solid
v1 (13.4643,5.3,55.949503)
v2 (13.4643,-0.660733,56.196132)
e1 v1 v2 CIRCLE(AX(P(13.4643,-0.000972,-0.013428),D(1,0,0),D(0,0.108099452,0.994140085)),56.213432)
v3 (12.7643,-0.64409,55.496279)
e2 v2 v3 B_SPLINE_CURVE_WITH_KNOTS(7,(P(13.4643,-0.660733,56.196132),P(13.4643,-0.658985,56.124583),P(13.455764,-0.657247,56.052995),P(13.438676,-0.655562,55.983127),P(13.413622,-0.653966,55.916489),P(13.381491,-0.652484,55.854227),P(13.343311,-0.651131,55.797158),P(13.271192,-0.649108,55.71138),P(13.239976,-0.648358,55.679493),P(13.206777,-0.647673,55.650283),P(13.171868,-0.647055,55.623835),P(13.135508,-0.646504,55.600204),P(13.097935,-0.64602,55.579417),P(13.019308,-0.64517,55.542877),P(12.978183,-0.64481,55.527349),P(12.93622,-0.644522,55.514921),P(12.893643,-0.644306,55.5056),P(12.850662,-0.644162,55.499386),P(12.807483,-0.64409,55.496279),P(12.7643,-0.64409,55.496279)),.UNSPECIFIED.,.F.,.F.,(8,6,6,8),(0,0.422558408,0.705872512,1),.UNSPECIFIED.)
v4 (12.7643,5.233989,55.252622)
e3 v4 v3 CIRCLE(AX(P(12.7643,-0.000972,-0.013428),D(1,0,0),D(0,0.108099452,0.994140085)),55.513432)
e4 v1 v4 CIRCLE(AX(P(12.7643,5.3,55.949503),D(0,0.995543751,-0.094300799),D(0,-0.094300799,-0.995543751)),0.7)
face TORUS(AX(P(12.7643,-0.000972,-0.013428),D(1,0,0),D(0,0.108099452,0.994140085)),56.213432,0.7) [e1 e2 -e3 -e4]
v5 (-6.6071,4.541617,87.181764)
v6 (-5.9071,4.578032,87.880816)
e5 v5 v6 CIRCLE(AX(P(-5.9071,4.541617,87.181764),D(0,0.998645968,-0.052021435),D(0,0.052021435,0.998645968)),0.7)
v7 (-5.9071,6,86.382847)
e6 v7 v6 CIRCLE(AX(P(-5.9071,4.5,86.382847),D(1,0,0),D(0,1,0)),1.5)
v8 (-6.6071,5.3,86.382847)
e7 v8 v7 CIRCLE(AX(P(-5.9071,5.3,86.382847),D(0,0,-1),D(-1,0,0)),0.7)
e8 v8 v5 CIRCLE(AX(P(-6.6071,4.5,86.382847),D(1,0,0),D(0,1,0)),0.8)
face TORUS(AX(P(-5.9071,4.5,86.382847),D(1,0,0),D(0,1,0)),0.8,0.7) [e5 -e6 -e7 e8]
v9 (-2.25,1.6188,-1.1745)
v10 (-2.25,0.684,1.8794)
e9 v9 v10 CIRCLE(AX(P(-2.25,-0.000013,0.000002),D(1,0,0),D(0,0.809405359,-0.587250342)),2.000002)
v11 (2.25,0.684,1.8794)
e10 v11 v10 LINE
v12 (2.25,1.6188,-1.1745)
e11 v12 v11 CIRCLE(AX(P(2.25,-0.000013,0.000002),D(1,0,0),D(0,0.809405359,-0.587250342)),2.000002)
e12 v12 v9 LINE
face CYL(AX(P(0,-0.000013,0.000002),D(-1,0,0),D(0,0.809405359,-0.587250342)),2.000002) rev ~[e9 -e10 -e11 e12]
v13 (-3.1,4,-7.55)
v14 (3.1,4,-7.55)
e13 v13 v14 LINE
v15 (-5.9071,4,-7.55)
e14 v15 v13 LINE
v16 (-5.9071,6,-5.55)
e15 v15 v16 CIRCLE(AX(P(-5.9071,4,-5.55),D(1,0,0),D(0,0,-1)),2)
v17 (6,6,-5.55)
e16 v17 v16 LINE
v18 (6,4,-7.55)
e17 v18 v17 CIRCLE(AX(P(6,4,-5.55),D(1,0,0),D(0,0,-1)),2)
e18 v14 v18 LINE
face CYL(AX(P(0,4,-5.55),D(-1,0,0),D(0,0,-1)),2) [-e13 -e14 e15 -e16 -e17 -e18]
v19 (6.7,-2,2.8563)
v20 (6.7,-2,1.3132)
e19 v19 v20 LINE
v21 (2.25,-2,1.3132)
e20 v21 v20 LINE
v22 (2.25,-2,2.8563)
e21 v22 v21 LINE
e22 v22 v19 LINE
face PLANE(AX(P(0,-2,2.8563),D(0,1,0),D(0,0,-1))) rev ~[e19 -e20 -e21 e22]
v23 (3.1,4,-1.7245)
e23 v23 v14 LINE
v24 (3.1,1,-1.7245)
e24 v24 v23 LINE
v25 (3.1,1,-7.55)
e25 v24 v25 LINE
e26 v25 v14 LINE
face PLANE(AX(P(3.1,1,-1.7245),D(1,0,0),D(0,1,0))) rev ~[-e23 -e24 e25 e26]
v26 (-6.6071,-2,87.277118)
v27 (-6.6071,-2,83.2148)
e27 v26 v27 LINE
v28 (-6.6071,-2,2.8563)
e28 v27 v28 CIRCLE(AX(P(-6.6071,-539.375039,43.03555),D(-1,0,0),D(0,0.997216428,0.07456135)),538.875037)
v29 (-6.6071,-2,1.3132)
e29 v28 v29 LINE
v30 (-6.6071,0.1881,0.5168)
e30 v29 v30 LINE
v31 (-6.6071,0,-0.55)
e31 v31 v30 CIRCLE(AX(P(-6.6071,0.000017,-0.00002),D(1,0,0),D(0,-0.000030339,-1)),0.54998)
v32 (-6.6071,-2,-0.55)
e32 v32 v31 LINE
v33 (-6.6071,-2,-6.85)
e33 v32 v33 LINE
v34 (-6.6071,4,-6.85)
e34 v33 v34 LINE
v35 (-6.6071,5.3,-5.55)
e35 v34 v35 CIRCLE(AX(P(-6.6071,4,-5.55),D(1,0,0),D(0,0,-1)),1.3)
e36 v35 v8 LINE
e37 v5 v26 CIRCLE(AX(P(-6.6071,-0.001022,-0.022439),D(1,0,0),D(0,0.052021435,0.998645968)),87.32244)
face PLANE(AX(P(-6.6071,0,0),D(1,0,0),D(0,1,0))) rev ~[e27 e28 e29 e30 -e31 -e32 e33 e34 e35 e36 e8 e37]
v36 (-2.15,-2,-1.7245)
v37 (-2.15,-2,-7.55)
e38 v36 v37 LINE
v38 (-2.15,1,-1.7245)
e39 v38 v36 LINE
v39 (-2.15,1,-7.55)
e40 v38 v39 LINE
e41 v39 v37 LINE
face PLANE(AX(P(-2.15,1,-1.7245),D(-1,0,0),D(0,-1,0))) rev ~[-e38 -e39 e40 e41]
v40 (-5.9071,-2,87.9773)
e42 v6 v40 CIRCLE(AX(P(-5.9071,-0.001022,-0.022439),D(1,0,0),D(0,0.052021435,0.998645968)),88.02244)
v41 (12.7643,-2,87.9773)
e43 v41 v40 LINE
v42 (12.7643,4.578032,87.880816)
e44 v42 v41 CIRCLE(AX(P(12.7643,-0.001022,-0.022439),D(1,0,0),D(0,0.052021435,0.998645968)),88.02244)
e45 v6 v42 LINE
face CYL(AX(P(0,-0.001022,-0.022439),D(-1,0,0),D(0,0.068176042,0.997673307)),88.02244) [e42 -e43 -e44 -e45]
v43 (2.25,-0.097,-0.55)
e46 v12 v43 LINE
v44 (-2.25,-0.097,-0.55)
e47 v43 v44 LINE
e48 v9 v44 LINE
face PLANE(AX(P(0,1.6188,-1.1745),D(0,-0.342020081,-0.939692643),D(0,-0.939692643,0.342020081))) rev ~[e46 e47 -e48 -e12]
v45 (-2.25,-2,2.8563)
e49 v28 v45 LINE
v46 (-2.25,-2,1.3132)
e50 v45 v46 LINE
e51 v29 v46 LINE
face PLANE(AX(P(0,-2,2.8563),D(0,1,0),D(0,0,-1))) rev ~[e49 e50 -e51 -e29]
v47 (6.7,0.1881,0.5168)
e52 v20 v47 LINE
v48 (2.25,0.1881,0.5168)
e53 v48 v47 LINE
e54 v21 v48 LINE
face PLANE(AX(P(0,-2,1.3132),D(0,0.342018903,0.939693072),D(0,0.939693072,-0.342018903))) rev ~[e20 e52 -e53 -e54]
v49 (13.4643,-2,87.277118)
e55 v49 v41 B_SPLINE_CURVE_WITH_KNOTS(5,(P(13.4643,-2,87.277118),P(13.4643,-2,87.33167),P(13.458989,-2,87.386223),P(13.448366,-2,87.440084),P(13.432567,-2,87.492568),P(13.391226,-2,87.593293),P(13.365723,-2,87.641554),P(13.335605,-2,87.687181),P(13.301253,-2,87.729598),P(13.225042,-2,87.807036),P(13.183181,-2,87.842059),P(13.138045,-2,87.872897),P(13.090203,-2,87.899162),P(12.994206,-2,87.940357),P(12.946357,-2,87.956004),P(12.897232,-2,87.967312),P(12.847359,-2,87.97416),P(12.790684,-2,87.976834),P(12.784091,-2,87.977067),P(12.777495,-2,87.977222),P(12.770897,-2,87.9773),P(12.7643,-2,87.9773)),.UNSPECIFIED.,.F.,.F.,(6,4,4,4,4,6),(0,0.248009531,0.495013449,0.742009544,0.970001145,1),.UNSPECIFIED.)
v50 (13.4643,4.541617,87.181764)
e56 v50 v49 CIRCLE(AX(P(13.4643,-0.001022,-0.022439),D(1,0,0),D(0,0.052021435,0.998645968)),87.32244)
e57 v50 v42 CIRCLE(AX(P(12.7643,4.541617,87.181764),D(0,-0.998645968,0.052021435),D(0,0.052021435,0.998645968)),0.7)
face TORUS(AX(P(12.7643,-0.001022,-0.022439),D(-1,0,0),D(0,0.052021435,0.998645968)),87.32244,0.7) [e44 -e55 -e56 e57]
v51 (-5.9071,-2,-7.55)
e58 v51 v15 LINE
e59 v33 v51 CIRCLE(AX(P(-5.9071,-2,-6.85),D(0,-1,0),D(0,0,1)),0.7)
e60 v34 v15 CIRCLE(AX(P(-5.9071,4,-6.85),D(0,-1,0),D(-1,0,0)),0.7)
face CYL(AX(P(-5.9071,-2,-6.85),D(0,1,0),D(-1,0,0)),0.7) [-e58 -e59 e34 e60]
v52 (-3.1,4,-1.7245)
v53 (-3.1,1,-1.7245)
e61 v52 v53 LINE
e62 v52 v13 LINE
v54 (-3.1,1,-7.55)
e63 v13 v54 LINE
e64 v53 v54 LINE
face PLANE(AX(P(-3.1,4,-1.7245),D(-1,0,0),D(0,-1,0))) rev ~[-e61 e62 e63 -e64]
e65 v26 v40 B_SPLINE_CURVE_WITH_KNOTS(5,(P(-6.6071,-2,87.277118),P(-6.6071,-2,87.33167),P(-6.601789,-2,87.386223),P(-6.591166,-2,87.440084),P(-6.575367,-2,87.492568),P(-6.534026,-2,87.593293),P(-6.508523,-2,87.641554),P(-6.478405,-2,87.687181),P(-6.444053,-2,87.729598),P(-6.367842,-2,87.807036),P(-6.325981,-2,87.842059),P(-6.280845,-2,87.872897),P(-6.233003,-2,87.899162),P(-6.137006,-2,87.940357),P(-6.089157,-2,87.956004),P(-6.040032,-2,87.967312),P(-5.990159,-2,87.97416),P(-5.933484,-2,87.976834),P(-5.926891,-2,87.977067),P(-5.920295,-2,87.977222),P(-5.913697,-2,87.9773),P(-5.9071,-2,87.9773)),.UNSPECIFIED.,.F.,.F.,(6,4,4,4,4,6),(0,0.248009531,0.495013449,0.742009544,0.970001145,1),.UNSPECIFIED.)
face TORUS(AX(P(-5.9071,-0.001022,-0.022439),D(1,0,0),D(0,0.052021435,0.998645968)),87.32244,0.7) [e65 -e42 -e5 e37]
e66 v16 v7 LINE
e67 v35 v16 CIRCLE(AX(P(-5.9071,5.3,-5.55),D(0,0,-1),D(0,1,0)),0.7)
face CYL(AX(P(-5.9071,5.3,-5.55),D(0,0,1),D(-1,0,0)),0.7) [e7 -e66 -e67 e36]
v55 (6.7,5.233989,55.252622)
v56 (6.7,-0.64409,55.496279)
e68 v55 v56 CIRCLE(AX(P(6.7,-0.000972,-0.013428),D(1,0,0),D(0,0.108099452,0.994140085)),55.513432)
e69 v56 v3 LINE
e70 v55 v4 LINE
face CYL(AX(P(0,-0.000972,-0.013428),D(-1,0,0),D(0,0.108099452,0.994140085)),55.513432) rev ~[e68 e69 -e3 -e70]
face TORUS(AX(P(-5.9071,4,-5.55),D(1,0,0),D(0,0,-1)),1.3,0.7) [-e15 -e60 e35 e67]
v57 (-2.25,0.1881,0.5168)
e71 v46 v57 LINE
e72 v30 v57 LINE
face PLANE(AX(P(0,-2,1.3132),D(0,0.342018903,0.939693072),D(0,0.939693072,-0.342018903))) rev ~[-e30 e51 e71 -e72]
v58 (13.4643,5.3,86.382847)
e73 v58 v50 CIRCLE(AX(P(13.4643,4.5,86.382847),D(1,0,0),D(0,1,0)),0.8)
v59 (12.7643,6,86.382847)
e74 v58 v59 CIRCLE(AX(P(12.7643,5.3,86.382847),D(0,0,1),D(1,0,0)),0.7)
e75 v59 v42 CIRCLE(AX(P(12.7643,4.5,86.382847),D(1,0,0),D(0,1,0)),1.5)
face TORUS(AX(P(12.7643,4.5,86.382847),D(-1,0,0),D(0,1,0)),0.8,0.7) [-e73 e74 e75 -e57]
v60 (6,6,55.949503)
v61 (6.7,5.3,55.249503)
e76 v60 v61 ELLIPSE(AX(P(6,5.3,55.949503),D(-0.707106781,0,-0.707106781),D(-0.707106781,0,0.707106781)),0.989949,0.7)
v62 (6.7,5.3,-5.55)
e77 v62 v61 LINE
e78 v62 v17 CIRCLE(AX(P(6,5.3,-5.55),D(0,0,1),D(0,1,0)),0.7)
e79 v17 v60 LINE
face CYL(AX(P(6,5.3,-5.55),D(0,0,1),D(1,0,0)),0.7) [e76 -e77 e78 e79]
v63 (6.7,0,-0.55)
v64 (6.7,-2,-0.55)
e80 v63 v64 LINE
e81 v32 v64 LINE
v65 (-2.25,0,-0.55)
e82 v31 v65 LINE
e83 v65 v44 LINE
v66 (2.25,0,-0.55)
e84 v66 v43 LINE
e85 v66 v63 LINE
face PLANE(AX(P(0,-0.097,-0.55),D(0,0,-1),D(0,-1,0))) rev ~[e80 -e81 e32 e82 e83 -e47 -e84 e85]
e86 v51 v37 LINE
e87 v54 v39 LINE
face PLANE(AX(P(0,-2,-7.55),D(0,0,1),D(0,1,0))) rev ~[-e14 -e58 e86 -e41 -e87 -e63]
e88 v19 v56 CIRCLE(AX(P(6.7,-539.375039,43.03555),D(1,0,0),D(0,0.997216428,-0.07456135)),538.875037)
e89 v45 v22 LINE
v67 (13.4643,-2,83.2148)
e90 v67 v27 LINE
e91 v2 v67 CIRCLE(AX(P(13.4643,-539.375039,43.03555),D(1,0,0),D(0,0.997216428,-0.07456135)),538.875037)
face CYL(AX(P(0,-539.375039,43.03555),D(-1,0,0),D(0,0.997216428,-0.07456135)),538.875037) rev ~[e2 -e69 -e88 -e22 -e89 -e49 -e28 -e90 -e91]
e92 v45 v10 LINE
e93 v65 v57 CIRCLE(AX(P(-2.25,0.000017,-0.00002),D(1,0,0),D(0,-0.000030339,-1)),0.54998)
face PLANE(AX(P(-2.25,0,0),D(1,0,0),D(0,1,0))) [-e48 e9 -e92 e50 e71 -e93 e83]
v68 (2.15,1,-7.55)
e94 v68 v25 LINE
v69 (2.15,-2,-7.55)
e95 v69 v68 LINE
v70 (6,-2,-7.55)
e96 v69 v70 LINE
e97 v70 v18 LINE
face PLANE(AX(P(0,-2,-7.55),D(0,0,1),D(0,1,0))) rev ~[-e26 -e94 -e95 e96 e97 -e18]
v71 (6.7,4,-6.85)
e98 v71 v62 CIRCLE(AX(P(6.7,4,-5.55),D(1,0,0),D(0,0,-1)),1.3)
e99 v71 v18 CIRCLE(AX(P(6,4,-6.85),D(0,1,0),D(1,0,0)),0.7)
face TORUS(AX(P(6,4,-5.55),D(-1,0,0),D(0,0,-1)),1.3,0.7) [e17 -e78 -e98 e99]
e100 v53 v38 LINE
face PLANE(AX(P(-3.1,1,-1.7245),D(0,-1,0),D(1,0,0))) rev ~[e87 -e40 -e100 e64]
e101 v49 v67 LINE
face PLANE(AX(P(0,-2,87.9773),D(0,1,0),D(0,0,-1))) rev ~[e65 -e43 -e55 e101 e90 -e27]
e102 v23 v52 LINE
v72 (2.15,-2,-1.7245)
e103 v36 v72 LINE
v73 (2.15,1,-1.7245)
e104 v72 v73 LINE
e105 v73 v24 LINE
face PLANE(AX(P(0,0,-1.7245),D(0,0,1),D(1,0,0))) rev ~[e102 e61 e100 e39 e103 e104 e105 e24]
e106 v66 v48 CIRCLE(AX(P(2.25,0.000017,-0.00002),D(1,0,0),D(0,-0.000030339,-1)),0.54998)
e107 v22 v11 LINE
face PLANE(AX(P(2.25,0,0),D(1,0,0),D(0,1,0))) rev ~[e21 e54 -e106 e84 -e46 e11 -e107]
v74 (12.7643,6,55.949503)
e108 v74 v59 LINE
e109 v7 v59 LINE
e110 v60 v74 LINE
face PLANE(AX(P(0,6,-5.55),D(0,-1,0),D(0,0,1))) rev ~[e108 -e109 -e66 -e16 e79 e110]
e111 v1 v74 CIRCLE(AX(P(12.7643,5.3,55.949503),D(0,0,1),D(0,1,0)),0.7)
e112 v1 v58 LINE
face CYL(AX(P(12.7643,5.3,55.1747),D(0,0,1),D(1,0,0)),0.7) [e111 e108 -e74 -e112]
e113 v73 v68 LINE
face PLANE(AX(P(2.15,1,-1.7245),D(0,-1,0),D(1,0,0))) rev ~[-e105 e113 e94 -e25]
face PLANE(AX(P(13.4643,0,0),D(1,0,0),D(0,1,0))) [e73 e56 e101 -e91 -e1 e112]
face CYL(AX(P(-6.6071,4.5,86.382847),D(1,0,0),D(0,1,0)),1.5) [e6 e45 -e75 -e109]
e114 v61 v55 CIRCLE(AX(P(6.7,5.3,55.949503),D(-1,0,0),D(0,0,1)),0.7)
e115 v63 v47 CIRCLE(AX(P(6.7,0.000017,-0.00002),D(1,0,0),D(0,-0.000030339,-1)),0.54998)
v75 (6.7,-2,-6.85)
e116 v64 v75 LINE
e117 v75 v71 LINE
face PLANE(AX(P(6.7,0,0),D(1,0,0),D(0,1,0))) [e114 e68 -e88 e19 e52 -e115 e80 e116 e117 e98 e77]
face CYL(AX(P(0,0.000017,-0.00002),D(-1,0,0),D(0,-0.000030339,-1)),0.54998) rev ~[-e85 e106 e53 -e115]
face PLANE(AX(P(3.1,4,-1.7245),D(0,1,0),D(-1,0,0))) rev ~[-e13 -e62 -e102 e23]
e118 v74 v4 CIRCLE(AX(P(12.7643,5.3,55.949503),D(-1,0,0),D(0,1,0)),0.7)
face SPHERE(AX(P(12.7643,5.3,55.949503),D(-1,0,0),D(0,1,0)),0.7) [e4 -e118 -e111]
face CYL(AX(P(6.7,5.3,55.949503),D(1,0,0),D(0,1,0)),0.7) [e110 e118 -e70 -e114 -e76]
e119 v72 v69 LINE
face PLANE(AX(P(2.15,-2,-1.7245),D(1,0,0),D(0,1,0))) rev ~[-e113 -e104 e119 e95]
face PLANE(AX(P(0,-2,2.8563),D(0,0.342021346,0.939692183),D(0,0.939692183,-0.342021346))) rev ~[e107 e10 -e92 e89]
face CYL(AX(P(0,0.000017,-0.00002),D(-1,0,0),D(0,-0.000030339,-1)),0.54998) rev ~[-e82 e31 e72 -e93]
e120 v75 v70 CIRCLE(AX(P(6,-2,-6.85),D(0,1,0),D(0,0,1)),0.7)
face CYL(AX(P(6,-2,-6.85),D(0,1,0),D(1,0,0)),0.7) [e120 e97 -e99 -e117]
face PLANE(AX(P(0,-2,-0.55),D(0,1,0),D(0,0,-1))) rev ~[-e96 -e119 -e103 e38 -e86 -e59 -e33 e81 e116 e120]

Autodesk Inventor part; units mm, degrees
ref_plane "YZ Plane" through (0, 0, 0) normal (1, 0, 0) x (0, 1, 0)
ref_plane "XZ Plane" through (0, 0, 0) normal (0, 1, 0) x (-1, 0, 0)
ref_plane "Slot Start Plane" through (0, 0, -1.7245) normal (0, 0, 1) x (1, 0, 0)
sketch "Key Profile" plane through (0, 0, 0) normal (1, 0, 0) x (0, 1, 0)
  line L0 (-2, 2.8563) -> (0.684, 1.8794)
  arc A0 (1.6188, -1.1745) -> (0.684, 1.8794) centre (0, 0) ccw
  line L1 (-2, 1.3132) -> (0.1881, 0.5168)
  arc A1 (0, -0.55) -> (0.1881, 0.5168) centre (0, 0) ccw
  line L2 (-2, 2.8563) -> (-2, -0.55)
  line L3 (0, 0) -> (-2, 0) construction
  line L4 (0, -0.55) -> (-2, -0.55)
  line L5 (1.6188, -1.1745) -> (-0.097, -0.55)
  line L6 (6, -5.55) -> (6, 87.7952)
  line L7 (-2, 87.9773) -> (-2, 2.8563)
  arc A2 (6, 87.7952) -> (-2, 87.9773) centre (0, 0) ccw
  line L8 (-2, -0.55) -> (-2, -7.55)
  arc A3 (4, -7.55) -> (6, -5.55) centre (4, -5.55) ccw
  line L9 (-2, -7.55) -> (4, -7.55)
  arc A4 (6, 55.1747) -> (-2, 55.464) centre (0, 0) ccw
  arc A5 (-2, 2.8563) -> (-2, 83.2148) centre (-539.3737, 43.0355) ccw
  point P0 (-0.5, 43.0355)
  point P1 (-0.6441, 55.4963)
  dimension "my_hingeCutRad" = 0.55
  dimension "my_hingeDepth" = 2
  dimension "my_hingeRegCutRad" = 2
  dimension "keyLength" = 88
  dimension "my_KeyHeight" = 8
  dimension "d107" = 20
  dimension "d122" = 4
  dimension "slotOffset" = 1.1745
  dimension "my_backWidth" = 7
  dimension "d128" = 55.5
  dimension "d143" = 1.5
  dimension "d144" = 4.7625
extrude "Upper (u)" add sketch "Key Profile" along normal blind 6.7 and the other way blind 6.6071 contours A5 A4 L6 A3 L9 L8 L4 L5 A0 L0 | L0 A0 L5 L4 A1 L1 L2
extrude "Lower (d)" add sketch "Key Profile" along normal blind 13.4643 and the other way blind 6.6071 contours A5 L7 A2 L6 A4
extrude "Protrusion Cutout" cut sketch "Key Profile" along normal mid plane 4.5 contours L0 A0 L5 L4 A1 L1 L2
fillet "Front Fillet" radius 1.5 1 edges at (3.4286, 6, 87.7952)
sketch "Slot Sketch" plane through (0, 0, -1.7245) normal (0, 0, 1) x (1, 0, 0)
  line L0 (2.15, -2) -> (2.15, 1)
  line L1 (3.1, 4) -> (-3.1, 4)
  line L2 (-2.15, 1) -> (-2.15, -2)
  line L3 (-2.15, -2) -> (2.15, -2)
  line L4 (0, -2) -> (0, 4) construction
  line L5 (-3.1, 4) -> (-3.1, 1)
  line L6 (-3.1, 1) -> (-2.15, 1)
  line L7 (2.15, 1) -> (3.1, 1)
  line L8 (3.1, 1) -> (3.1, 4)
  point P0 (0, 0)
  dimension "d109" = 2
  dimension "my_slotHeadOffset" = 1
  dimension "my_slotHeadHeight" = 3
  dimension "my_slotHeadWidth" = 6.2
  dimension "my_neckSlotWidth" = 4.3
extrude "Slot" cut sketch "Slot Sketch" against normal through all
fillet "Edge Softening" radius 0.7 13 edges at (6.7, 5.4142, -6.9642) (6.7, 1, -7.55) (6.7, 6, 24.8124) (-6.6071, 5.4142, -6.9642) (-6.6071, 1, -7.55) (-6.6071, 6, 40.4164) (-6.6071, 5.5879, 87.4156) (-6.6071, 1.2899, 87.9905) (13.4643, 5.5879, 87.4156) (13.4643, 1.2899, 87.9905) (13.4643, 6, 70.7788) (13.4643, 2.6828, 55.4351) (10.0821, 6, 55.1747)
equation "\"my_headHeight\" = 3"
equation "\"my_headOffset\" = 1"
equation "\"whiteKeyWidth\" = 20.07143"
properties part number "CKey0"
